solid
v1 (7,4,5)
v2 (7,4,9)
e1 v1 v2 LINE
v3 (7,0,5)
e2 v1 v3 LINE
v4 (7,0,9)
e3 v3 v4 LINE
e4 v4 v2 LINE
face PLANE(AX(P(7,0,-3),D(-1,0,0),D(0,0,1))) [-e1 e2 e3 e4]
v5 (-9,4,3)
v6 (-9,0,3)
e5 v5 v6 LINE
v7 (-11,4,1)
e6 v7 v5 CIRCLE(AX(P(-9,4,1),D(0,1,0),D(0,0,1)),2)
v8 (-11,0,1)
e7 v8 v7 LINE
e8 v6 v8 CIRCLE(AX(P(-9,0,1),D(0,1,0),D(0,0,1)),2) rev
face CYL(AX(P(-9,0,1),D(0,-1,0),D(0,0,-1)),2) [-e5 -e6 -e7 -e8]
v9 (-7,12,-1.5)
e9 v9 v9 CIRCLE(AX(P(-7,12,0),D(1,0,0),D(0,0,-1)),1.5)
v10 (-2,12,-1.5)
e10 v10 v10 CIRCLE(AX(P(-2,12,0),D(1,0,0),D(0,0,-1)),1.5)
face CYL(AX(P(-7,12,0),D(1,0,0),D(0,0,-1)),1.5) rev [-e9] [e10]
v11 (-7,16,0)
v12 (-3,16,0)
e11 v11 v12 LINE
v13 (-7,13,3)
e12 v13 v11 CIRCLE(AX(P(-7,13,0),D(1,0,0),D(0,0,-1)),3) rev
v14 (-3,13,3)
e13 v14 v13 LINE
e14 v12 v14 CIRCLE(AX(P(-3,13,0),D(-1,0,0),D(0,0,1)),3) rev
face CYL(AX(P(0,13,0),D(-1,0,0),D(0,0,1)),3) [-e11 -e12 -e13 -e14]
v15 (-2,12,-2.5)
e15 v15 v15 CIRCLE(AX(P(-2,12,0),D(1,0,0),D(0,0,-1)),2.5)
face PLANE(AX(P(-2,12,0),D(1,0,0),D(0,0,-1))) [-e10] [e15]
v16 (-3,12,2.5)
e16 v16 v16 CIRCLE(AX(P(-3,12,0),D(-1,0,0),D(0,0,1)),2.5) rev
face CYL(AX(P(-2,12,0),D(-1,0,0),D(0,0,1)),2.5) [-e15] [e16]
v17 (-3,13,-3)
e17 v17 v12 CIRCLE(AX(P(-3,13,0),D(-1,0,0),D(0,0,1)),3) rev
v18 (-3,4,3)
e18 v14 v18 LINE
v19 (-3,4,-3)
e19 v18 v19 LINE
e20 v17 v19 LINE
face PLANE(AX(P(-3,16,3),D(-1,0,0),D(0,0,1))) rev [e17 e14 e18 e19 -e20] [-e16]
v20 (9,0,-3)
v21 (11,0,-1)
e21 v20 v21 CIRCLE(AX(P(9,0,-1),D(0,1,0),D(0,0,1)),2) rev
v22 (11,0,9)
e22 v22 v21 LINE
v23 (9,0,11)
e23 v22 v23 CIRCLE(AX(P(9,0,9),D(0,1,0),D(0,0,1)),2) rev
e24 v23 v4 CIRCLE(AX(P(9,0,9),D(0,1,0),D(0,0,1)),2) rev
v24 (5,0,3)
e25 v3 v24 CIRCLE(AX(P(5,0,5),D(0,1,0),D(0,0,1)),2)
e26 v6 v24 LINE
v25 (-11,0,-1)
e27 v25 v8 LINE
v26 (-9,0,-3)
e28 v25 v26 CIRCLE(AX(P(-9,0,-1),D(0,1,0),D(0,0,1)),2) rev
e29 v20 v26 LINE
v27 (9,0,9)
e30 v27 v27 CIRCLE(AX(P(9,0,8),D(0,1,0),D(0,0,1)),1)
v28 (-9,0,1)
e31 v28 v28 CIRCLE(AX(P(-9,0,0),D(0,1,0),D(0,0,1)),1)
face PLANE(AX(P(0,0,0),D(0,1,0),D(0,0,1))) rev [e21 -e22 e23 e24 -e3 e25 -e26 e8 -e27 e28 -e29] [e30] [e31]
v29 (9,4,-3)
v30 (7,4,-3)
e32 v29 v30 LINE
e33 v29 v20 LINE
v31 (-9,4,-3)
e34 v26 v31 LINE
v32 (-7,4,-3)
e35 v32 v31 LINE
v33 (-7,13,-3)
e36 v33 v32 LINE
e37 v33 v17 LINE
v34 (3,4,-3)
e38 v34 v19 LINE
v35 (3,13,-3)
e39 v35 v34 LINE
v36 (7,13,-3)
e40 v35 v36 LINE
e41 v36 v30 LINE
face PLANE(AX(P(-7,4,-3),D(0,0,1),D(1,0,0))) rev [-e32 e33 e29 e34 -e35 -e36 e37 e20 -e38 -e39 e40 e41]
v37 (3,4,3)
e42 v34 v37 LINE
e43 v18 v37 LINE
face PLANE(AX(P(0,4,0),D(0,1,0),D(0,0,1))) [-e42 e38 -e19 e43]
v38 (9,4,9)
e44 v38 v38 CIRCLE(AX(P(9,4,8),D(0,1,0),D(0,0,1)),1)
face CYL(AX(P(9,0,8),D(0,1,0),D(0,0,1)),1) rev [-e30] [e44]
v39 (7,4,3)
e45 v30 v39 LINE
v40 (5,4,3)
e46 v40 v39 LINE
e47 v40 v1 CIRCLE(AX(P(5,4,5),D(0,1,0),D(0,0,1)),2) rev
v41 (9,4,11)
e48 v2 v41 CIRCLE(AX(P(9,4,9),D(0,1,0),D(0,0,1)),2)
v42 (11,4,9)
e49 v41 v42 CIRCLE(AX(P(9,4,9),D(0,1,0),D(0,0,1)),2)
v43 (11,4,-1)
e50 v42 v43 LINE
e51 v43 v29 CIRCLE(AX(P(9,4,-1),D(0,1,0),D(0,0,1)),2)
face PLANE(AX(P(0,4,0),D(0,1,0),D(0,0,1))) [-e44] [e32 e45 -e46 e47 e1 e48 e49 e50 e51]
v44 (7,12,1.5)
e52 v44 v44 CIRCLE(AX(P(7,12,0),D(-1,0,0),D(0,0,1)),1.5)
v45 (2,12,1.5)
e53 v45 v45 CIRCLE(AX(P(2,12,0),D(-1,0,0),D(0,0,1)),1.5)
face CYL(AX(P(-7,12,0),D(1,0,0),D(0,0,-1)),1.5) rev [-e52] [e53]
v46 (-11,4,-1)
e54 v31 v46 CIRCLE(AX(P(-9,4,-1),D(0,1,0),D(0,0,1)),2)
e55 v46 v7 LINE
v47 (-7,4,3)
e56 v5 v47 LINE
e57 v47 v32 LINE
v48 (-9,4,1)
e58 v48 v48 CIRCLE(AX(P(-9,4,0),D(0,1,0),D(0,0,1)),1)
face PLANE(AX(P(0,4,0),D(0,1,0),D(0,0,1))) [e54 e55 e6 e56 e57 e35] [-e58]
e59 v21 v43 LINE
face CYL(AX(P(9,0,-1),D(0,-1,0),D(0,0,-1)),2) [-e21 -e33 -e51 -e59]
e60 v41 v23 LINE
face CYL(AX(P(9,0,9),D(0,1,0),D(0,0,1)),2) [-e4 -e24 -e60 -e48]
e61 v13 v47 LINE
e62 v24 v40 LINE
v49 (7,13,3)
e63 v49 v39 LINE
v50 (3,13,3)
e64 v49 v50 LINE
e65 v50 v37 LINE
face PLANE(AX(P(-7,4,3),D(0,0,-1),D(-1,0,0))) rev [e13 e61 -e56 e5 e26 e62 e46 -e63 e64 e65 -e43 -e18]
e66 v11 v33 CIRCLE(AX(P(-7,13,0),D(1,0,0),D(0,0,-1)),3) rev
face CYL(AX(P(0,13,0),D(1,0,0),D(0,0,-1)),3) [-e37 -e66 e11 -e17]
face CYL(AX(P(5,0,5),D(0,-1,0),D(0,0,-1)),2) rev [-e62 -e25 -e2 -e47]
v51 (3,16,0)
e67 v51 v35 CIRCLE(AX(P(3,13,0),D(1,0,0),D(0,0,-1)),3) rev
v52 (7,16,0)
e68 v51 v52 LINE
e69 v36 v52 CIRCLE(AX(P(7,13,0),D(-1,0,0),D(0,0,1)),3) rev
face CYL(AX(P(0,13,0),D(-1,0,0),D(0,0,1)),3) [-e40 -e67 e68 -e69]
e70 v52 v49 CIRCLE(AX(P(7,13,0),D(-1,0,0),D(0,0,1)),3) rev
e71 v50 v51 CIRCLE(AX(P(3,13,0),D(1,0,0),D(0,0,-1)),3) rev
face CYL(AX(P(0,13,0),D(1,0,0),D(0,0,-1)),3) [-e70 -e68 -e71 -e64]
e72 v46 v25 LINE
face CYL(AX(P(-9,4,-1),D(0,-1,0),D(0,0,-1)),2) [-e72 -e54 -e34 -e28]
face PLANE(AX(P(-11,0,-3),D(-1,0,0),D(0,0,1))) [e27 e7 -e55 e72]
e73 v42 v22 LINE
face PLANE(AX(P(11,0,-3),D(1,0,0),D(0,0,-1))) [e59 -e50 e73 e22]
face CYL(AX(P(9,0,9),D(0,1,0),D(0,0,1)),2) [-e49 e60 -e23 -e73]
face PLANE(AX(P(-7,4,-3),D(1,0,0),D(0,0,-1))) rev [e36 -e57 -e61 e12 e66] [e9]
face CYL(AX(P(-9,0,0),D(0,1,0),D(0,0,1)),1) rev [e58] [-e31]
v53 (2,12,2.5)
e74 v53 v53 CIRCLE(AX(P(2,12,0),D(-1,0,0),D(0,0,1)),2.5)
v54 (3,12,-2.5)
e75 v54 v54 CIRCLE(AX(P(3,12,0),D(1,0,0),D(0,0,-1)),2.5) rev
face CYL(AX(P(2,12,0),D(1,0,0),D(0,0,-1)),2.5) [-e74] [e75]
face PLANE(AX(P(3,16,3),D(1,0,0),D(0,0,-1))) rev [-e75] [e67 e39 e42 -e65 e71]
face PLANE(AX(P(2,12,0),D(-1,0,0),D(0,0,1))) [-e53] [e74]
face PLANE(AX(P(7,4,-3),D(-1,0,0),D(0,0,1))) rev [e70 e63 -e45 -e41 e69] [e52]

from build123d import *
from build123d.topology import SkipClean

# Parameters (mm, degrees)
SKETCH2_W               = 14
SKETCH2_H               = 6
BOSS_EXTRUDE1_DEPTH     = 4
SKETCH3_W               = 4
SKETCH3_H               = 6
BOSS_EXTRUDE2_DEPTH     = 12
CUT_EXTRUDE1_DEPTH      = 22.470910554
CUT_EXTRUDE1_DEPTH_BACK = 22.470910554
SKETCH4_R               = 1.5
BOSS_EXTRUDE3_START     = 1
SKETCH5_R               = 2.5
SKETCH5_R_2             = 1.5
BOSS_EXTRUDE3_DEPTH     = 1
SKETCH6_R               = 2.5
SKETCH6_R_2             = 1.5
BOSS_EXTRUDE4_DEPTH     = 1
SKETCH7_R               = 1
SKETCH7_W               = 4
SKETCH7_H               = 6
BOSS_EXTRUDE5_DEPTH     = 4
FILLET1_R               = 2
FILLET2_R               = 3


with BuildPart() as part:
    # Sketch2 → Boss-Extrude1 (new body)
    with BuildSketch(Plane(origin=(0, 0, 0), x_dir=(1, 0, 0), z_dir=(0, 1, 0))):
        Rectangle(SKETCH2_W, SKETCH2_H)
    extrude(amount=BOSS_EXTRUDE1_DEPTH)

    # Sketch3 → Boss-Extrude2 (add)
    with BuildSketch(Plane(origin=(0, 4, 0), x_dir=(1, 0, 0), z_dir=(0, 1, 0))):
        with Locations((-5, 0)):
            Rectangle(SKETCH3_W, SKETCH3_H)
        with Locations((5, 0)):
            Rectangle(SKETCH3_W, SKETCH3_H)
    extrude(amount=BOSS_EXTRUDE2_DEPTH)

    # Sketch4 → Cut-Extrude1 (cut, two sides: drawn at the far end of the back side and taken through both)
    with BuildSketch(Plane(origin=(7, 0, 0), x_dir=(0, 0, -1), z_dir=(1, 0, 0)).offset(-CUT_EXTRUDE1_DEPTH_BACK)):
        with Locations((0, 12)):
            Circle(SKETCH4_R)
    extrude(amount=CUT_EXTRUDE1_DEPTH + CUT_EXTRUDE1_DEPTH_BACK, mode=Mode.SUBTRACT)

    # Sketch5 → Boss-Extrude3 (add)
    with BuildSketch(Plane(origin=(-3, 0, 0), x_dir=(0, 0, -1), z_dir=(1, 0, 0)).offset(BOSS_EXTRUDE3_START)):
        with Locations(Location((0, 12, 0), (0, 0, 180))):
            Circle(SKETCH5_R)
        with Locations((0, 12)):
            Circle(SKETCH5_R_2, mode=Mode.SUBTRACT)
    extrude(amount=-BOSS_EXTRUDE3_DEPTH)

    # Sketch6 → Boss-Extrude4 (add)
    with SkipClean():  # the faces are left unmerged after this step: merging them gives an invalid solid
        with BuildSketch(Plane.ZY.offset(-3)):
            with Locations((0, 12)):
                Circle(SKETCH6_R)
            with Locations((0, 12)):
                Circle(SKETCH6_R_2, mode=Mode.SUBTRACT)
        extrude(amount=BOSS_EXTRUDE4_DEPTH)

    # Sketch7 → Boss-Extrude5 (add)
    # profile 1 of 2: a face of its own
    with SkipClean():  # the faces are left unmerged after this step: merging them gives an invalid solid
        with BuildSketch(Plane(origin=(0, 4, 0), x_dir=(1, 0, 0), z_dir=(0, 1, 0))):
            Polygon((11, 3), (11, -3), (11, -11), (7, -11), (7, -3), (7, 3), align=None)
            with Locations(Location((9, -8, 0), (0, 0, 270))):
                Circle(SKETCH7_R, mode=Mode.SUBTRACT)
        # profile 2 of 2: a face of its own
        with BuildSketch(Plane(origin=(0, 4, 0), x_dir=(1, 0, 0), z_dir=(0, 1, 0))):
            with Locations((-9, 0)):
                Rectangle(SKETCH7_W, SKETCH7_H)
            with Locations(Location((-9, 0, 0), (0, 0, 270))):
                Circle(SKETCH7_R, mode=Mode.SUBTRACT)
        extrude(amount=-BOSS_EXTRUDE5_DEPTH)

    # Fillet1
    fillet1_edges = [part.edges().sort_by_distance(p)[0] for p in [
        (-11, 2, -3),
        (11, 2, -3),
        (11, 2, 11),
        (7, 2, 11),
        (-11, 2, 3),
        (7, 2, 3),
    ]]
    fillet(fillet1_edges, radius=FILLET1_R - 0.0001)  # a hair under: the kernel refuses the full size

    # Fillet2
    fillet2_edges = [part.edges().sort_by_distance(p)[0] for p in [
        (-5, 16, -3),
        (5, 16, -3),
        (5, 16, 3),
        (-5, 16, 3),
    ]]
    fillet(fillet2_edges, radius=FILLET2_R - 0.0001)  # a hair under: the kernel refuses the full size


solid = part.part
